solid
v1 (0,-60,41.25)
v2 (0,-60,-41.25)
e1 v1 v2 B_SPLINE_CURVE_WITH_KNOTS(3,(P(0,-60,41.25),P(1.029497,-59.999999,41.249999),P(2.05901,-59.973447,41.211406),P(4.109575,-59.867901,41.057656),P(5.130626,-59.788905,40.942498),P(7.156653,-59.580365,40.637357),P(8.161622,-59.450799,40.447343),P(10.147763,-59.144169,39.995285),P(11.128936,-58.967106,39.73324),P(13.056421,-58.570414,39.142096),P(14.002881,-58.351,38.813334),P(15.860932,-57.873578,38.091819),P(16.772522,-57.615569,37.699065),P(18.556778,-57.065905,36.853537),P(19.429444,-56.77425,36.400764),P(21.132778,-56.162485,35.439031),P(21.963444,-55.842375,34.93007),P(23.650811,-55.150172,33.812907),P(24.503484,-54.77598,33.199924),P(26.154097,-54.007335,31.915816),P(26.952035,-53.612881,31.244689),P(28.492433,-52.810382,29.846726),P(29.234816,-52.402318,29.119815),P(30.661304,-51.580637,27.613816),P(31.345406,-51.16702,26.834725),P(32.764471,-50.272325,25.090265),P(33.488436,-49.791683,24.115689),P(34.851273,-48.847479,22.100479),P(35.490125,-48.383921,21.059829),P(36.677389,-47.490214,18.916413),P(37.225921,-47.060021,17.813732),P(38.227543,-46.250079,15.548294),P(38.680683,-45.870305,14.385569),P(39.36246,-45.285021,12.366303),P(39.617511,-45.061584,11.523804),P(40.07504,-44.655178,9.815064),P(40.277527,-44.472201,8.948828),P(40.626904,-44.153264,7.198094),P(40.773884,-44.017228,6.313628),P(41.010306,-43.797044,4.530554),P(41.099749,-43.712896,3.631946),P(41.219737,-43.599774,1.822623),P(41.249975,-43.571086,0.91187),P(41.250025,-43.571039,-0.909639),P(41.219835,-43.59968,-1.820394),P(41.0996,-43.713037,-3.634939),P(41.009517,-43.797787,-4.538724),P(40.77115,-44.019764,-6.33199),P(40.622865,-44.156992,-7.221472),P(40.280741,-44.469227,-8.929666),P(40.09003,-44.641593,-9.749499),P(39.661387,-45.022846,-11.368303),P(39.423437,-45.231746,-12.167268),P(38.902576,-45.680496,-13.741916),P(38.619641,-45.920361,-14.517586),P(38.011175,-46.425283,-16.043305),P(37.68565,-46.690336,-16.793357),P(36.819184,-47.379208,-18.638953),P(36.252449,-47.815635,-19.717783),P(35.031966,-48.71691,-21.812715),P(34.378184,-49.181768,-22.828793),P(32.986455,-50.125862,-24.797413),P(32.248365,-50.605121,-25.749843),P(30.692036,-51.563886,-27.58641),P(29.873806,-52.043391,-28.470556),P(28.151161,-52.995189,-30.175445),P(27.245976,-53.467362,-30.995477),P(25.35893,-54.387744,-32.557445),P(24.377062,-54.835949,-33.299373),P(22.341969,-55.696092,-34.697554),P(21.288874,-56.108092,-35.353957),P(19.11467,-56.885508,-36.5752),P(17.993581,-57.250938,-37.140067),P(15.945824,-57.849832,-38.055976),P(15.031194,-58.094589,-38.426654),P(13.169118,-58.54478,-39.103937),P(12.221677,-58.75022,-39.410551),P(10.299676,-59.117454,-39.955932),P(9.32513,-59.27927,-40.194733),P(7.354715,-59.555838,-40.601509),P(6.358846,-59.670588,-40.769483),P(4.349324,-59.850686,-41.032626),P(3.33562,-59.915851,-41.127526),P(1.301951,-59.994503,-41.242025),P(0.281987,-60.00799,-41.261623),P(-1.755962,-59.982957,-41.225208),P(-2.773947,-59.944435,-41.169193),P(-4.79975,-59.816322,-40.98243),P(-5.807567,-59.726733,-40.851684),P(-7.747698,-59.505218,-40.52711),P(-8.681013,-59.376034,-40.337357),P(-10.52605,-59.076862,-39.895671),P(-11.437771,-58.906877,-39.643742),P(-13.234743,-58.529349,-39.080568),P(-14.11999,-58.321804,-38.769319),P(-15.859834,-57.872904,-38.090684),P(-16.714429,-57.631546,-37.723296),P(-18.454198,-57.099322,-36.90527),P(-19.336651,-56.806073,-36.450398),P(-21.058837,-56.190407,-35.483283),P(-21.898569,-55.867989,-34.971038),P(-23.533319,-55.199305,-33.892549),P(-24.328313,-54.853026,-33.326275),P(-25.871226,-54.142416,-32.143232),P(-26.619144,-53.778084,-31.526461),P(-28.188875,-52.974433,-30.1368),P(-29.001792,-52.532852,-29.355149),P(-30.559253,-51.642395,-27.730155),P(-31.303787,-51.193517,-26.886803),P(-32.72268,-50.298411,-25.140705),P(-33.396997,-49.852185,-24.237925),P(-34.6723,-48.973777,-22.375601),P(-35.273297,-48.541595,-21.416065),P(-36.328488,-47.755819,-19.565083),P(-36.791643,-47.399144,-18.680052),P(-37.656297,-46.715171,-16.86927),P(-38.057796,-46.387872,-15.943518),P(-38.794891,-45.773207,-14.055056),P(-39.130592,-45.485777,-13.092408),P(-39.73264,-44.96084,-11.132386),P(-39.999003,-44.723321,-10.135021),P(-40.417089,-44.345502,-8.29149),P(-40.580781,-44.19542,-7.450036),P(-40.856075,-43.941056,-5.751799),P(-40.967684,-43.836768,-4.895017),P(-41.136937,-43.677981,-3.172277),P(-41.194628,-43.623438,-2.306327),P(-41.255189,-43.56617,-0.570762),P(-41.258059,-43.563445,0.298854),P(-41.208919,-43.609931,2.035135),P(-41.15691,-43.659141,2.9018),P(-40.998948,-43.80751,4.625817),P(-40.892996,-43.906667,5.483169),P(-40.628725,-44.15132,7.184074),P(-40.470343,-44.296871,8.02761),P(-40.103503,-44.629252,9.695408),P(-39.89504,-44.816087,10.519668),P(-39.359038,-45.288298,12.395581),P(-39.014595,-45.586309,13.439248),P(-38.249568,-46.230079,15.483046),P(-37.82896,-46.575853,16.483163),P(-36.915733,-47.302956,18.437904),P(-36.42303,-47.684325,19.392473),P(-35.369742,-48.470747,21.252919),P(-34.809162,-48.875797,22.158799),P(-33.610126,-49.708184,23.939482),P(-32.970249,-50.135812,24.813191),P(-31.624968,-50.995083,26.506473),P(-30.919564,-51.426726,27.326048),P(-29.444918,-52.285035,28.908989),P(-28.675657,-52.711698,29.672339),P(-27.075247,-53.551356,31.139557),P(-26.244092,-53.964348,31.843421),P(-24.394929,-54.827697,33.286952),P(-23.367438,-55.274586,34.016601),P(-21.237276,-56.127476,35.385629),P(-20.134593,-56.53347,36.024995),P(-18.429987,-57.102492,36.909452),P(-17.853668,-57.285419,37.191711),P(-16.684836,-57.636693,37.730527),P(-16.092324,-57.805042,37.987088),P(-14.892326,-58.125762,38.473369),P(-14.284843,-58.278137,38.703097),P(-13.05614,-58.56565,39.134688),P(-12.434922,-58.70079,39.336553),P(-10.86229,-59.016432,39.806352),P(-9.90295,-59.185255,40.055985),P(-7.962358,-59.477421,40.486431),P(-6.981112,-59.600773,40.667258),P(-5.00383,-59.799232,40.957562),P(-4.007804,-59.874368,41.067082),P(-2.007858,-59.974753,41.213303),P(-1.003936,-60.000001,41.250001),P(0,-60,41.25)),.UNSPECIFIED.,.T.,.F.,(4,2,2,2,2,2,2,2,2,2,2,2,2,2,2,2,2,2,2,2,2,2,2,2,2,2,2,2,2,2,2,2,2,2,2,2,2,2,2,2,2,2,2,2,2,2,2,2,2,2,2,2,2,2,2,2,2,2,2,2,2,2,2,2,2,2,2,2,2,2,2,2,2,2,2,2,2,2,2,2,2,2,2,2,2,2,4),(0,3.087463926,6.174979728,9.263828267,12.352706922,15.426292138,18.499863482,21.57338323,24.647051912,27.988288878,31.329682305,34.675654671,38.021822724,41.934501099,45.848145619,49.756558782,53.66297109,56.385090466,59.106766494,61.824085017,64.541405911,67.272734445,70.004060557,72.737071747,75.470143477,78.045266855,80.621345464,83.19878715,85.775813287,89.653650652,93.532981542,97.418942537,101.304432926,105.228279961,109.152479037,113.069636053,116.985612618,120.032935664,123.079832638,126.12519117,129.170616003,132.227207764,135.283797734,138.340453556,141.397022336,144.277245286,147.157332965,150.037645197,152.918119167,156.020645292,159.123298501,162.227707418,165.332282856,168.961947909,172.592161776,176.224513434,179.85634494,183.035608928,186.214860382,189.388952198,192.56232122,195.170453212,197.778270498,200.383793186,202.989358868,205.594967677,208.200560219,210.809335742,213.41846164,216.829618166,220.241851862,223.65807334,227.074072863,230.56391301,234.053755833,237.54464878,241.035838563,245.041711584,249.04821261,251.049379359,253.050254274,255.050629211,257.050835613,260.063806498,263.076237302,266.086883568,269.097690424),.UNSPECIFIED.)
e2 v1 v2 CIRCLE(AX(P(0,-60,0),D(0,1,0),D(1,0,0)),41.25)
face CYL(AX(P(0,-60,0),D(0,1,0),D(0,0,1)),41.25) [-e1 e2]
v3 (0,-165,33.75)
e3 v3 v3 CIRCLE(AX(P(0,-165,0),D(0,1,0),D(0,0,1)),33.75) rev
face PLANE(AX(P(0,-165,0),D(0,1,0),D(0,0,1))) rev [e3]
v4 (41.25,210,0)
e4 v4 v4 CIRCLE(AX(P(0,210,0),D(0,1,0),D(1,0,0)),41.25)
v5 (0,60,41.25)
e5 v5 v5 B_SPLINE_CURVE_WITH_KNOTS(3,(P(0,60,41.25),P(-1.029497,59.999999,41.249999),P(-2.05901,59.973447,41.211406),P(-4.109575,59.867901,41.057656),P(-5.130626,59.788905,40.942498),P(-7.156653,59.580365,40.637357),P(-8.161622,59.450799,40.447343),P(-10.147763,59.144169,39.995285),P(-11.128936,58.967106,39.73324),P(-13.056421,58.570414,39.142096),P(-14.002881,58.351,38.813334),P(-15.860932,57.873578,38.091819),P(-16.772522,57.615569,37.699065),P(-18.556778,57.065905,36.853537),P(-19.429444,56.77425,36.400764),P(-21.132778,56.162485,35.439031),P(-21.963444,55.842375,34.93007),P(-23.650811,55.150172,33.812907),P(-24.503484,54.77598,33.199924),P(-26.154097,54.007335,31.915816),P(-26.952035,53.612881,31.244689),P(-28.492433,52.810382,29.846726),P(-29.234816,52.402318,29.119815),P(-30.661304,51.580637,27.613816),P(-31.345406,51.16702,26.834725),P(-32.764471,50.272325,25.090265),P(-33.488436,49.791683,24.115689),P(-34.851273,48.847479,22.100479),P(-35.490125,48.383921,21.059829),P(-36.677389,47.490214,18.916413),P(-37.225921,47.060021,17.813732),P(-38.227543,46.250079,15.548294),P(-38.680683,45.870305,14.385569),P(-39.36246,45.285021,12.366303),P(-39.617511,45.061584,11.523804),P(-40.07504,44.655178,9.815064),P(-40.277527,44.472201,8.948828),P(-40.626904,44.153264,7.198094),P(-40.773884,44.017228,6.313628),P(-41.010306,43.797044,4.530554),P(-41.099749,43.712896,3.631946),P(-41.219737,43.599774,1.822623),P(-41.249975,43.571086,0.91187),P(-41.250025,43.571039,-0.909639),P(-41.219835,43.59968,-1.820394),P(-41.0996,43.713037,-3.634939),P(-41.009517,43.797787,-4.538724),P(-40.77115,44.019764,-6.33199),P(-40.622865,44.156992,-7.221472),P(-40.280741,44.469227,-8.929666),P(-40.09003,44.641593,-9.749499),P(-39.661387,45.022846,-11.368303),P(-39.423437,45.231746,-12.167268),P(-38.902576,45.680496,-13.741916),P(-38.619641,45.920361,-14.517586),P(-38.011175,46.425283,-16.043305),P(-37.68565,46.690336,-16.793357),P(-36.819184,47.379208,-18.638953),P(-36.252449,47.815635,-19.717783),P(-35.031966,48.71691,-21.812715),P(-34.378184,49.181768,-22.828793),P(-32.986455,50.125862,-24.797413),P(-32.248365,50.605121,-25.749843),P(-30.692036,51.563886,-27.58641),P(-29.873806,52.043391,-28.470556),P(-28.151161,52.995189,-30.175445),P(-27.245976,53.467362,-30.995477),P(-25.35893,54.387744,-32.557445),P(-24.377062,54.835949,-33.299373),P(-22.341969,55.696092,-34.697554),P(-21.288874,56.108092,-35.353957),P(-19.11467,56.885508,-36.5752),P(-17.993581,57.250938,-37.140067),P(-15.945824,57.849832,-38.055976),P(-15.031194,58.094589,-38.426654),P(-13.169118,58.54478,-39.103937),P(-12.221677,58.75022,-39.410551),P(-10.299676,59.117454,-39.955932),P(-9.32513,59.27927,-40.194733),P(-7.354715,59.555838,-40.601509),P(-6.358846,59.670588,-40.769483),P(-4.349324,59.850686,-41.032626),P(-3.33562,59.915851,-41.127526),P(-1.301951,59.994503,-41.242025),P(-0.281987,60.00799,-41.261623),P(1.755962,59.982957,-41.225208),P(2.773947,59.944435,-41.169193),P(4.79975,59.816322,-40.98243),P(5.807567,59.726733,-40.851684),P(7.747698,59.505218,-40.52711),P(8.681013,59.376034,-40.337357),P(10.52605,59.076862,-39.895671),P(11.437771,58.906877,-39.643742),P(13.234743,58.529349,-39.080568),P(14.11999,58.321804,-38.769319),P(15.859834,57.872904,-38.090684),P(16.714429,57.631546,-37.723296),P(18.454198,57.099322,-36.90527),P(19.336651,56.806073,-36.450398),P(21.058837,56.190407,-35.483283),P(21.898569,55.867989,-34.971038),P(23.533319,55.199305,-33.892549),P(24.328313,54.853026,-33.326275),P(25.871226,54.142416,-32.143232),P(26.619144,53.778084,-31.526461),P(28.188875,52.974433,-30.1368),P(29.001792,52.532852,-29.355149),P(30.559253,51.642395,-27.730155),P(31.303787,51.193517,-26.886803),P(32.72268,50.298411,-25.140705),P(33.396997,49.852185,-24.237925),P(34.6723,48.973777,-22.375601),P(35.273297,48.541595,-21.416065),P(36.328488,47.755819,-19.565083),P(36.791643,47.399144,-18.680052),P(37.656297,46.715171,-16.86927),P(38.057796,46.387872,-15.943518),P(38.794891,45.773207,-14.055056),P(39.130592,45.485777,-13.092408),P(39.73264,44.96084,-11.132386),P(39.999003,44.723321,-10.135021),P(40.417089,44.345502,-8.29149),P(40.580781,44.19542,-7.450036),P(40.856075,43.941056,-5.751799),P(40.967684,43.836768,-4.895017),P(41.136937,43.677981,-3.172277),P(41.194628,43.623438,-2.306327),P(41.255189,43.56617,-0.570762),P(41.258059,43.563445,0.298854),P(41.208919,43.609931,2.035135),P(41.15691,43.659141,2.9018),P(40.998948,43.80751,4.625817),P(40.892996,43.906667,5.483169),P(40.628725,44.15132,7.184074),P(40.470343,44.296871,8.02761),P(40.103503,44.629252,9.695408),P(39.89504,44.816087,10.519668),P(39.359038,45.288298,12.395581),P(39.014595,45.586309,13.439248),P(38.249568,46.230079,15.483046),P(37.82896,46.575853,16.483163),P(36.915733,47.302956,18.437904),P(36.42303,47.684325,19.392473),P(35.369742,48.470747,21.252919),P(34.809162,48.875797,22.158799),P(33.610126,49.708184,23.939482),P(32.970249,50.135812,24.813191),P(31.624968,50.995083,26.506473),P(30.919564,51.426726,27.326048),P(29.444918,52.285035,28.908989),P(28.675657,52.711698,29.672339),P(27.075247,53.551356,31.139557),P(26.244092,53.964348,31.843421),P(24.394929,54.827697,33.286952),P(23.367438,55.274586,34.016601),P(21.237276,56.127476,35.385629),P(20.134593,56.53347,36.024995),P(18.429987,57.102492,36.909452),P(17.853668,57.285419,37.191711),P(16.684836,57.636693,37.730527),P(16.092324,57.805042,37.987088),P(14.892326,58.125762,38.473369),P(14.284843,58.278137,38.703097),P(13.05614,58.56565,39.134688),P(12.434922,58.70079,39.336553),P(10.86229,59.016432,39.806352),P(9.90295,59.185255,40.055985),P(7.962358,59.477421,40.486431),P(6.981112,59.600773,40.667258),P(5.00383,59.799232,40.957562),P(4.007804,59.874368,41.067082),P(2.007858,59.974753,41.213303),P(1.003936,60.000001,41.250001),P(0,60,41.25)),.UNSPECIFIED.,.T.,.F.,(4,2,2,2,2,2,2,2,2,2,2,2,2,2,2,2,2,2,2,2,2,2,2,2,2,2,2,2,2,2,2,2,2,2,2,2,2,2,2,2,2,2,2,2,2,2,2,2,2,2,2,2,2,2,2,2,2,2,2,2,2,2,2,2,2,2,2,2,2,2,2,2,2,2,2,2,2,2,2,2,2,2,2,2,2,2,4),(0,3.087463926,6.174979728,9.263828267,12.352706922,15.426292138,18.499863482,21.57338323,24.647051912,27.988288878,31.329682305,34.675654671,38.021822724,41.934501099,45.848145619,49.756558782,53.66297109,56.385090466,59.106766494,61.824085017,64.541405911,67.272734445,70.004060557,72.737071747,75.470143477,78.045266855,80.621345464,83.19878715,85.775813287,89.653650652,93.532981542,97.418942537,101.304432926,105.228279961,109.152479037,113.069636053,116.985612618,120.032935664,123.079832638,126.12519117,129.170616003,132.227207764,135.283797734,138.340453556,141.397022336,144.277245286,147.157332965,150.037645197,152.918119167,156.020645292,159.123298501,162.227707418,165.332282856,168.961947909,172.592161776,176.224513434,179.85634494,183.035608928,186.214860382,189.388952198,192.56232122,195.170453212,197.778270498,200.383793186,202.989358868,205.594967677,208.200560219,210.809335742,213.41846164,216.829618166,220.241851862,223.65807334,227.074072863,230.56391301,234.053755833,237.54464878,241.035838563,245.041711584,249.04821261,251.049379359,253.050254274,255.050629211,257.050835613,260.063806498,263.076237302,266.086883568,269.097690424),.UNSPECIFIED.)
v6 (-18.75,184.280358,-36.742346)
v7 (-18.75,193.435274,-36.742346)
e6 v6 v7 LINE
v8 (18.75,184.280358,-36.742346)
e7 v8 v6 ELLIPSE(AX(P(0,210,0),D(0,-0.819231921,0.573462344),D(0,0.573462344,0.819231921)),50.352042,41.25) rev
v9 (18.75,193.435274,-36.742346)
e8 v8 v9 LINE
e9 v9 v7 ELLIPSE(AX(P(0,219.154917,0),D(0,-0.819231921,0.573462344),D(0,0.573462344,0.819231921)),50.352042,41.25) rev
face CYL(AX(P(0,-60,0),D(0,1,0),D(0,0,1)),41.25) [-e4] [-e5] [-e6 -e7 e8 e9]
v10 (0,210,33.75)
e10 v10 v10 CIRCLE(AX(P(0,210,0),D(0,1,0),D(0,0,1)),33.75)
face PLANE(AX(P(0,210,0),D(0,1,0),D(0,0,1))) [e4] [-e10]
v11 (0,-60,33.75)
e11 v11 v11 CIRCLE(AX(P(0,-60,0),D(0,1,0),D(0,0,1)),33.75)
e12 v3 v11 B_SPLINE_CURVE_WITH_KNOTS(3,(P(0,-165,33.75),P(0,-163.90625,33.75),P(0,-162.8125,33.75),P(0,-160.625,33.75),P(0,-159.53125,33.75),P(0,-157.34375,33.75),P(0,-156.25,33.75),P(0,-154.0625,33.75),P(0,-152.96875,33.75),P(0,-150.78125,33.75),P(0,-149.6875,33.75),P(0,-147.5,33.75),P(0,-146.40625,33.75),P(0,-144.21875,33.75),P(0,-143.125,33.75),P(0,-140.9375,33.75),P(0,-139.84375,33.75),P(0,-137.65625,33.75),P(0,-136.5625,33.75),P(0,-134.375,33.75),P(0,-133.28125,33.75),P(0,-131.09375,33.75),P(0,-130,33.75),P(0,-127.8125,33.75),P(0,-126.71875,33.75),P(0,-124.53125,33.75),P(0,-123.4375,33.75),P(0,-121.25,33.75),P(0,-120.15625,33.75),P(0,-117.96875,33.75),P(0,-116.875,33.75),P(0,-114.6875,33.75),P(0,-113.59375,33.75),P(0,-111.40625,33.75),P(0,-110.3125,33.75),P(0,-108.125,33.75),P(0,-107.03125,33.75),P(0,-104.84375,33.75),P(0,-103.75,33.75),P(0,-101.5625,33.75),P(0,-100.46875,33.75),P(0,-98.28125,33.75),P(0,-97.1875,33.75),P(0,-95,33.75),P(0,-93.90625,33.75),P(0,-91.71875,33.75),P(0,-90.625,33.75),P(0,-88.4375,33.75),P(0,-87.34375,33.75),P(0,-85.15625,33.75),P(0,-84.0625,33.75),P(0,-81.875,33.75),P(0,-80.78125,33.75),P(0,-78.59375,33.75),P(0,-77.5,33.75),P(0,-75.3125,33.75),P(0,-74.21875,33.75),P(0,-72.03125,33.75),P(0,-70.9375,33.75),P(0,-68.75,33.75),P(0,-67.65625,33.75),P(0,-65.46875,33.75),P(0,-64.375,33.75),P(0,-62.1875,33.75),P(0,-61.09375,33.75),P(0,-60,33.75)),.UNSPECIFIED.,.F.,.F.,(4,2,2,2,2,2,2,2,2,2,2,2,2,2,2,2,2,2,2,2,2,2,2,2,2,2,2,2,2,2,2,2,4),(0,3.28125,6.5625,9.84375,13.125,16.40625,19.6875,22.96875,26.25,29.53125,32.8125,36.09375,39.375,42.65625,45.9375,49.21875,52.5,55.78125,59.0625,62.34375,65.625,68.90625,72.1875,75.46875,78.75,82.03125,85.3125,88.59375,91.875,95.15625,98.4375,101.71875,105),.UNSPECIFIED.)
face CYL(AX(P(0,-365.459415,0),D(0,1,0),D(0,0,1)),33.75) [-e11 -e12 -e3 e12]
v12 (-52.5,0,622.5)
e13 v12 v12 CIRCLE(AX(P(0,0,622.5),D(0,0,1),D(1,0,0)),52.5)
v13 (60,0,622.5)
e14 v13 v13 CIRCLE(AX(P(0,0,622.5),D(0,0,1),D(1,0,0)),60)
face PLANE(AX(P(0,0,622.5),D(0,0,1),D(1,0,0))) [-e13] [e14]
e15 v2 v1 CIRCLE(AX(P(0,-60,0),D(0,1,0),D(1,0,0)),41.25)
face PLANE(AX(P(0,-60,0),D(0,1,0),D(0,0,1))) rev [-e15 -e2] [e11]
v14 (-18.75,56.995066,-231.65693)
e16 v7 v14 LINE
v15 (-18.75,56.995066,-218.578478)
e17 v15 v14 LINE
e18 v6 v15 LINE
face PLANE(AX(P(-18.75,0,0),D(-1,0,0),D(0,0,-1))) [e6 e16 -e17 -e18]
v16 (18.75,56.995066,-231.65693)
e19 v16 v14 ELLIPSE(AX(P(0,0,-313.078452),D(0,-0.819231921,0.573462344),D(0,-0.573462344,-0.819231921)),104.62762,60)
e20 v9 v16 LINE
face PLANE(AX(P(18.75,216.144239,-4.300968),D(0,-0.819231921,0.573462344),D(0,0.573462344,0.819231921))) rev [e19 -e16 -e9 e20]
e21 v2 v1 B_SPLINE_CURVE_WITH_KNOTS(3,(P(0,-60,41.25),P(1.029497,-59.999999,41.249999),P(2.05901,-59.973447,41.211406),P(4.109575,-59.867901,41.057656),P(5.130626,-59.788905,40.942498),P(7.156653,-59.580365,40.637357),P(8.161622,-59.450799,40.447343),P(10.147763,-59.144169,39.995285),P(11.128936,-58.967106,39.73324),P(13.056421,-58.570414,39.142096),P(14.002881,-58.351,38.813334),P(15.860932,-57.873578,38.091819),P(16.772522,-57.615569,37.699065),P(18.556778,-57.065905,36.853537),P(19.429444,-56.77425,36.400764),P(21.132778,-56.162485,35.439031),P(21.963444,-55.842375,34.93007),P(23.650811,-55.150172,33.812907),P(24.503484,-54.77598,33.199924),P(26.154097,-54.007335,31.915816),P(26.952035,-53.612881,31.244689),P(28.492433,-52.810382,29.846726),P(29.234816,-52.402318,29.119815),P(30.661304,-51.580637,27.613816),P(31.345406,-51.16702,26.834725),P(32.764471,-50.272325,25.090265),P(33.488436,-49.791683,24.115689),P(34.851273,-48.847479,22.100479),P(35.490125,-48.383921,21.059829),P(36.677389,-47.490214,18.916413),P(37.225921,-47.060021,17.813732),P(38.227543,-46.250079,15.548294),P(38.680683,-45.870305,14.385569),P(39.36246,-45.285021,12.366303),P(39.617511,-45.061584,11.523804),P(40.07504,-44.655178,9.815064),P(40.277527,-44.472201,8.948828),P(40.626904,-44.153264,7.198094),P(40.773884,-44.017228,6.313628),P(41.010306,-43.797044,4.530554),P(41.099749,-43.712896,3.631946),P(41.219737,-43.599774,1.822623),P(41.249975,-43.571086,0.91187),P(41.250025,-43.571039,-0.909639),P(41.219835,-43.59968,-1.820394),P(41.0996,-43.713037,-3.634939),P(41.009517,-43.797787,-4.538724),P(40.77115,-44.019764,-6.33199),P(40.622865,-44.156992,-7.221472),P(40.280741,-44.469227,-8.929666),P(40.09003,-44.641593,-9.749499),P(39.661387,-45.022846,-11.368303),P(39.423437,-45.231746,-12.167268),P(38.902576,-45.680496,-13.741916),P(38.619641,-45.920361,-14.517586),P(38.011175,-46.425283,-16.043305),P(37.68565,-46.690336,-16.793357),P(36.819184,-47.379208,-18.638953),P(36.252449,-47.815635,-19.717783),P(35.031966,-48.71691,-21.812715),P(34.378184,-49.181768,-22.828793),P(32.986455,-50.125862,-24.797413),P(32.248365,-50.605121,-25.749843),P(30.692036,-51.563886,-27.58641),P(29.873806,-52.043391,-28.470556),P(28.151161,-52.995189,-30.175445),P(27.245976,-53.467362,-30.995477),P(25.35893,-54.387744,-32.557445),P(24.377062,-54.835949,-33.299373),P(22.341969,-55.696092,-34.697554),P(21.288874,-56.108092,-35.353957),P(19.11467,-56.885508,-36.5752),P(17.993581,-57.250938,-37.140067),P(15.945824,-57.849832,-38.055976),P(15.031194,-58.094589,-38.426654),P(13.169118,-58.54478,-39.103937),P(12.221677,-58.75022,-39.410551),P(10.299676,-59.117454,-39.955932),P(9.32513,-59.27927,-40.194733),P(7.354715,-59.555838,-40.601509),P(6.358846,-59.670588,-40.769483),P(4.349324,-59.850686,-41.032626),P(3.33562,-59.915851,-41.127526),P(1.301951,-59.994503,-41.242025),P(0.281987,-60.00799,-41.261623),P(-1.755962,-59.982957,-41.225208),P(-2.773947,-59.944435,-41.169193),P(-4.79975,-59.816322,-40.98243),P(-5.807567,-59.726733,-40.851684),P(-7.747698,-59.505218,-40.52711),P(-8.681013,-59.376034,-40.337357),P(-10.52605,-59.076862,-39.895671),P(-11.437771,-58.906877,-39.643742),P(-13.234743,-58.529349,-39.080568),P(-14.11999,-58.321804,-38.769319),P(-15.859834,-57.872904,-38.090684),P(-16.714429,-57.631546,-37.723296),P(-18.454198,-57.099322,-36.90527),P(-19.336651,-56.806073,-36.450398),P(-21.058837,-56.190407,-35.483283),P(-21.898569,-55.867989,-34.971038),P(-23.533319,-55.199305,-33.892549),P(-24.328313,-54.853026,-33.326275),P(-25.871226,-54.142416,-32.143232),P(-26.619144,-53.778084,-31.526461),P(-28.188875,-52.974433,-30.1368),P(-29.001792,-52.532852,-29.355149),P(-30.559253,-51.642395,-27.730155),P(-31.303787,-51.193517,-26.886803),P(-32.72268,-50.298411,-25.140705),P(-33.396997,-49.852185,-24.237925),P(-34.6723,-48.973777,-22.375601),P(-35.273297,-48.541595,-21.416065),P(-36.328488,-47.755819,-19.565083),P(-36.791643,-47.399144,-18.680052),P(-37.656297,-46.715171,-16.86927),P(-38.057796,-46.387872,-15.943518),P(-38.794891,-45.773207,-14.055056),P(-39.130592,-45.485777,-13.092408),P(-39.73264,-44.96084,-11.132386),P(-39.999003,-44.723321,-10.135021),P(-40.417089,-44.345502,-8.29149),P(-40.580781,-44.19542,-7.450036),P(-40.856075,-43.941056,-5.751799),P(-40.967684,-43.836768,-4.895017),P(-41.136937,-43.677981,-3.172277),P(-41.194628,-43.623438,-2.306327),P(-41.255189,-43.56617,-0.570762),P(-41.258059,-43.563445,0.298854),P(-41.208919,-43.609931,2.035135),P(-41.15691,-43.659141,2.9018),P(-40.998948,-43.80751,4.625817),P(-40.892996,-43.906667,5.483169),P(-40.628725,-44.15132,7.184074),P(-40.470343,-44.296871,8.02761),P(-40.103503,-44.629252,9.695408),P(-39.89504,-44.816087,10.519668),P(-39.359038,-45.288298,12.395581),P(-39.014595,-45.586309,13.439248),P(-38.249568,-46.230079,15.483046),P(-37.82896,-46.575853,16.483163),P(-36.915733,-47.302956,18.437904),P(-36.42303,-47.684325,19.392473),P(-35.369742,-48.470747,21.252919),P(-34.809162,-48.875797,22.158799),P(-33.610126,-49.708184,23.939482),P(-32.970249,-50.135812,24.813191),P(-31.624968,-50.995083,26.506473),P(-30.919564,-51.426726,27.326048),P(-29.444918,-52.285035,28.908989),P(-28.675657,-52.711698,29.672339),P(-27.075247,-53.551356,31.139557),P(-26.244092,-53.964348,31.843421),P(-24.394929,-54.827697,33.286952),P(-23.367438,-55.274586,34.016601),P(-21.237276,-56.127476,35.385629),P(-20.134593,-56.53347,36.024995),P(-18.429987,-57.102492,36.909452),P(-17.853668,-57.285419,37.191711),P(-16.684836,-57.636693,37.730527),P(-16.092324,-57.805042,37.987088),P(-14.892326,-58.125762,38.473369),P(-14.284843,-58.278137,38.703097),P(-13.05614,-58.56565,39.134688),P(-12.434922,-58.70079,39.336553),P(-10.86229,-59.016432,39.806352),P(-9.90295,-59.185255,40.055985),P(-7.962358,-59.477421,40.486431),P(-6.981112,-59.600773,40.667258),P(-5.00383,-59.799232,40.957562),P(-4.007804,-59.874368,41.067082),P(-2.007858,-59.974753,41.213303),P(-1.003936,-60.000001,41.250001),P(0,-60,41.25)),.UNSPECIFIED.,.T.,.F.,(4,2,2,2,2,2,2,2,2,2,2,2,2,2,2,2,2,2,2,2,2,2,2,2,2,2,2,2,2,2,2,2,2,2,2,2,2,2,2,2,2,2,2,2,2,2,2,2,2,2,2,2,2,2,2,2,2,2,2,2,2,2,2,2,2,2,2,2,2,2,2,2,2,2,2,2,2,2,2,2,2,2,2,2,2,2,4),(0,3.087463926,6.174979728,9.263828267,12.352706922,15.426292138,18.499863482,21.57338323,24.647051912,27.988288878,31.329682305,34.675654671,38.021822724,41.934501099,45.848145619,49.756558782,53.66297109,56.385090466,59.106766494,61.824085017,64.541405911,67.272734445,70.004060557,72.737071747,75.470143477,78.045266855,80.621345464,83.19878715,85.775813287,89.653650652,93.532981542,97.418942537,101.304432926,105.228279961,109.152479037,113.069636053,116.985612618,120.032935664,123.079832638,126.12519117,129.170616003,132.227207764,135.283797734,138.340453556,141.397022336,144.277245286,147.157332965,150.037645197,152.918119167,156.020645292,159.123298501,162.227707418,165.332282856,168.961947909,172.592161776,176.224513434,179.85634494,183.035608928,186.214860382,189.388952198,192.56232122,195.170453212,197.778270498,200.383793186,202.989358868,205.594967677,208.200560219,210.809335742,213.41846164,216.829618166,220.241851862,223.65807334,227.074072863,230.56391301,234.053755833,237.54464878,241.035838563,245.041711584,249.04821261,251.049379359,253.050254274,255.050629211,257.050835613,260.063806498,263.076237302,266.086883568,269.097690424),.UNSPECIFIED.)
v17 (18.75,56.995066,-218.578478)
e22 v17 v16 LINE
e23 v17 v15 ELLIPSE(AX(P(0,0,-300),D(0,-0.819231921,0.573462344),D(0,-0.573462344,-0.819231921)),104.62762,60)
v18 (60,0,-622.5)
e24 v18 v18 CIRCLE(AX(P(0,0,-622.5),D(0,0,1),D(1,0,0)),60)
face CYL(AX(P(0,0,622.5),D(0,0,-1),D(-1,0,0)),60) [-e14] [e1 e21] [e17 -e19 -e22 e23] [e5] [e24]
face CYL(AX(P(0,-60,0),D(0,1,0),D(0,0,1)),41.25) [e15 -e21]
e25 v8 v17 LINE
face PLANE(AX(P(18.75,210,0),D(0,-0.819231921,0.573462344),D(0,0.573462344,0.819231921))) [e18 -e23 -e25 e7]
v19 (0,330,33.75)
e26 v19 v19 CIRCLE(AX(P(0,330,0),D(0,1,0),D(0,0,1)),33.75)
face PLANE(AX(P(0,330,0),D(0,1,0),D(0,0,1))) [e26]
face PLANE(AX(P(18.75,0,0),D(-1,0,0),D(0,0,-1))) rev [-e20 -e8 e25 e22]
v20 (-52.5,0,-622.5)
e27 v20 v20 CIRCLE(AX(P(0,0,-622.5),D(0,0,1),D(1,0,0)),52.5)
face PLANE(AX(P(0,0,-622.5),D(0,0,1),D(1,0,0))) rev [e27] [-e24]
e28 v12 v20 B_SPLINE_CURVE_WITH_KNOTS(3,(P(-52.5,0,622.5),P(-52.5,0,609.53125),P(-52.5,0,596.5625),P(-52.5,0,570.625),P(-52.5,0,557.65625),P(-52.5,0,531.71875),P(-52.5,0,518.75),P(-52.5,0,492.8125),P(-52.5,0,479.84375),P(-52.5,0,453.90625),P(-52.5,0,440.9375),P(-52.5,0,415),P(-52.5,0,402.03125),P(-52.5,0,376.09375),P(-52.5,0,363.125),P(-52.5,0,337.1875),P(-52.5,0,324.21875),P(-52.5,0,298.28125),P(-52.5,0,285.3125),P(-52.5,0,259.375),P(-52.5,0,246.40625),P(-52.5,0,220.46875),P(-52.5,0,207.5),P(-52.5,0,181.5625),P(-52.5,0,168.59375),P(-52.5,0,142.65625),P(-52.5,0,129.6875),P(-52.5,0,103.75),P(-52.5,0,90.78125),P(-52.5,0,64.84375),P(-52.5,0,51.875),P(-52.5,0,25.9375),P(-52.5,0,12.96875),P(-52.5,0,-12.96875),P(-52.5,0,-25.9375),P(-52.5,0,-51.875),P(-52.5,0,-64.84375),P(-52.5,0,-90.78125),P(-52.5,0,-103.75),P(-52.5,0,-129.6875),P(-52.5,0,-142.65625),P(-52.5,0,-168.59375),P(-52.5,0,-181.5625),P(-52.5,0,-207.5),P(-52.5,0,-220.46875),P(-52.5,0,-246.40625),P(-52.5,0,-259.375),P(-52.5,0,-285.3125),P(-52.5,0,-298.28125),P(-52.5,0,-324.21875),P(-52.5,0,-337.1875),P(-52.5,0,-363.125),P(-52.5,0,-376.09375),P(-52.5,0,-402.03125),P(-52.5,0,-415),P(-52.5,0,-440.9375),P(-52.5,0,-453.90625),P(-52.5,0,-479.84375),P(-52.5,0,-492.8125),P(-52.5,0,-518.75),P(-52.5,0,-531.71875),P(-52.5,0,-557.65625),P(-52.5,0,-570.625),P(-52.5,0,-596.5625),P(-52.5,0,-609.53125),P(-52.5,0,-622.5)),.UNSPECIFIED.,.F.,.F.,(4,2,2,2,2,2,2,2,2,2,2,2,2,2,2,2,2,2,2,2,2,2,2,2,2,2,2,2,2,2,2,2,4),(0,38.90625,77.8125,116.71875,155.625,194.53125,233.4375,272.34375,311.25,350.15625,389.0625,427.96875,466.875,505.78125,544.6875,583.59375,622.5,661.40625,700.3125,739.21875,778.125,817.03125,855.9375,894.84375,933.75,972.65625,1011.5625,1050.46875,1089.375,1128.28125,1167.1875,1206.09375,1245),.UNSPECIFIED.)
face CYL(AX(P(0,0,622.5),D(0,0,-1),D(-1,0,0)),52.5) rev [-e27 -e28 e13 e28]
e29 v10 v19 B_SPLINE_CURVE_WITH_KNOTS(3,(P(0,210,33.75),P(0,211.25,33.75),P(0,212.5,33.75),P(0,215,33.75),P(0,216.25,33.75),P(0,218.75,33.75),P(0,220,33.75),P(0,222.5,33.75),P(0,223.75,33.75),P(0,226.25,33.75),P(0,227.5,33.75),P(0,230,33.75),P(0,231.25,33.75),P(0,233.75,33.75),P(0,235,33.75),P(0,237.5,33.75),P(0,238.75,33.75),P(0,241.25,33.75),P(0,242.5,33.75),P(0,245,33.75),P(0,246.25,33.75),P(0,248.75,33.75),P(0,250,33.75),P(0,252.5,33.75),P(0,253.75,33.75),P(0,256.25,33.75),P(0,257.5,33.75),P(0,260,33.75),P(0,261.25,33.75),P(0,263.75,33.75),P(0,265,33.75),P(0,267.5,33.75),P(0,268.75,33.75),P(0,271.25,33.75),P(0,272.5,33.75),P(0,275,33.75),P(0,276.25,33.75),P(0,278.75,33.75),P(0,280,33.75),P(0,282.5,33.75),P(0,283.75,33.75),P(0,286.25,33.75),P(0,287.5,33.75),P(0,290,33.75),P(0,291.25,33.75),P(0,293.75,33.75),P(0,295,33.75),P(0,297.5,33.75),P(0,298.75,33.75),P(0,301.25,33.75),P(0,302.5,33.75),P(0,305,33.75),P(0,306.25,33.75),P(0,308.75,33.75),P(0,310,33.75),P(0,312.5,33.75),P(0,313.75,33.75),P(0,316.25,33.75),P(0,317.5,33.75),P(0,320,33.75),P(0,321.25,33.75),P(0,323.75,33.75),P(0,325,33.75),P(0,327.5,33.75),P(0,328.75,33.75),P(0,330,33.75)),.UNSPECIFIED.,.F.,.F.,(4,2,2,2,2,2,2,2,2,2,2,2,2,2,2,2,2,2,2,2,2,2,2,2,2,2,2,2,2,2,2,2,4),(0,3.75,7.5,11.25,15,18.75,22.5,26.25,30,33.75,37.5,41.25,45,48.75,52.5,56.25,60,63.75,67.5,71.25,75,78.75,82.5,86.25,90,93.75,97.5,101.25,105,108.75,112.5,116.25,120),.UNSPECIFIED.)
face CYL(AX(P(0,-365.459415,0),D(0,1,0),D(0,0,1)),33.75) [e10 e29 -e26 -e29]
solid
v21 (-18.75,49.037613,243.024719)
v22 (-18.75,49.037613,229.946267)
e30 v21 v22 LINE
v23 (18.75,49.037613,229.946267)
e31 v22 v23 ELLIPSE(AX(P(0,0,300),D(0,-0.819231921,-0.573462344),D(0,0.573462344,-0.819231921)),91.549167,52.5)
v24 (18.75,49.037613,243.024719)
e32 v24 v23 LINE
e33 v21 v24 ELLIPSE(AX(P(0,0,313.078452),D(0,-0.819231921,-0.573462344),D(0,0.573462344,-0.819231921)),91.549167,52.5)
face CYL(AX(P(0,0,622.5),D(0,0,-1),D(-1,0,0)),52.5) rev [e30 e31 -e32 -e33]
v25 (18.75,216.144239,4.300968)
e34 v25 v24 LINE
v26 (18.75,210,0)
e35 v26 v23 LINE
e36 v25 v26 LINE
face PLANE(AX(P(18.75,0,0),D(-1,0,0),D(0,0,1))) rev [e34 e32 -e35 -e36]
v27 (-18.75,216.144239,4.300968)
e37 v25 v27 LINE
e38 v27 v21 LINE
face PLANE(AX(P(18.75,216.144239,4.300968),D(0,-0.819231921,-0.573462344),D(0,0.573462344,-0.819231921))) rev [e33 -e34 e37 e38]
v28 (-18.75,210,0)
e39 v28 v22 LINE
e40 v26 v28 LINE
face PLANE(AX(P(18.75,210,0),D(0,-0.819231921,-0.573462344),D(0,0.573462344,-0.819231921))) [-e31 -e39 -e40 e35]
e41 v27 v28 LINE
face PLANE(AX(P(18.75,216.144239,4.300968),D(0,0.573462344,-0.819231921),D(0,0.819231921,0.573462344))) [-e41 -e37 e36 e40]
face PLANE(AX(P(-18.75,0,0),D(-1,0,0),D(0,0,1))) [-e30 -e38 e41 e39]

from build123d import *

# Parameters (mm, degrees)
SKETCH1_R                = 60
SKETCH1_R_2              = 52.5
EXTRUDE_THIN1_DEPTH      = 622.5
EXTRUDE_THIN2_DEPTH      = 210
EXTRUDE_THIN2_DEPTH_BACK = 60
SKETCH2_R                = 41.25
SKETCH2_R_2              = 33.75
BOSS_EXTRUDE1_DEPTH      = 120
BOSS_EXTRUDE1_DEPTH_BACK = 375
SKETCH3_R                = 33.75
EXTRUDE_THIN3_DEPTH      = 18.75
SKETCH5_R                = 52.5
CUT_EXTRUDE1_DEPTH       = 1290.389390472


with BuildPart() as part:
    # Sketch1 → Extrude-Thin1 (new, symmetric)
    with BuildSketch(Plane.XY):
        Circle(SKETCH1_R)
        Circle(SKETCH1_R_2, mode=Mode.SUBTRACT)
    extrude(amount=EXTRUDE_THIN1_DEPTH, both=True)

    # Sketch2 → Extrude-Thin2 (add, two sides: drawn at the far end of the back side and taken through both)
    with BuildSketch(Plane(origin=(0, 0, 0), x_dir=(1, 0, 0), z_dir=(0, 1, 0)).offset(-EXTRUDE_THIN2_DEPTH_BACK)):
        Circle(SKETCH2_R)
        Circle(SKETCH2_R_2, mode=Mode.SUBTRACT)
    extrude(amount=EXTRUDE_THIN2_DEPTH + EXTRUDE_THIN2_DEPTH_BACK)

    # Sketch3 → Boss-Extrude1 (add, two sides: drawn at the far end of the back side and taken through both)
    with BuildSketch(Plane(origin=(0, 210, 0), x_dir=(1, 0, 0), z_dir=(0, 1, 0)).offset(-BOSS_EXTRUDE1_DEPTH_BACK)):
        with Locations(Location((0, 0, 0), (0, 0, 270))):
            Circle(SKETCH3_R)
    extrude(amount=BOSS_EXTRUDE1_DEPTH + BOSS_EXTRUDE1_DEPTH_BACK)


with BuildPart() as body_2:
    # Sketch4 → Extrude-Thin3 (new, symmetric)
    with BuildSketch(Plane(origin=(0, 0, 0), x_dir=(0, 0, -1), z_dir=(1, 0, 0))):
        Polygon((0, 210), (-300, 0), (-304.300967583, 6.144239404), (-4.300967583, 216.144239404), align=None)
    extrude_thin3 = extrude(amount=EXTRUDE_THIN3_DEPTH, both=True)


with BuildPart() as part_1:
    add(part.part)

    # Mirror2: Extrude-Thin3 across plane
    add(extrude_thin3.mirror(Plane.XY))


with BuildPart() as cut_extrude1_tool:
    # Sketch5 → Cut-Extrude1 (new, through all)
    with BuildSketch(Plane(origin=(0, 0, -622.5), x_dir=(-1, 0, 0), z_dir=(0, 0, -1))):
        Circle(SKETCH5_R)
    extrude(amount=-CUT_EXTRUDE1_DEPTH)


with BuildPart() as part_2:
    add(part_1.part)

    # Cut-Extrude1: cut by cut_extrude1_tool
    add(cut_extrude1_tool.part, mode=Mode.SUBTRACT)


with BuildPart() as body_2_1:
    add(body_2.part)

    # Cut-Extrude1: cut by cut_extrude1_tool
    add(cut_extrude1_tool.part, mode=Mode.SUBTRACT)


solid = Compound([part_2.part, body_2_1.part])
